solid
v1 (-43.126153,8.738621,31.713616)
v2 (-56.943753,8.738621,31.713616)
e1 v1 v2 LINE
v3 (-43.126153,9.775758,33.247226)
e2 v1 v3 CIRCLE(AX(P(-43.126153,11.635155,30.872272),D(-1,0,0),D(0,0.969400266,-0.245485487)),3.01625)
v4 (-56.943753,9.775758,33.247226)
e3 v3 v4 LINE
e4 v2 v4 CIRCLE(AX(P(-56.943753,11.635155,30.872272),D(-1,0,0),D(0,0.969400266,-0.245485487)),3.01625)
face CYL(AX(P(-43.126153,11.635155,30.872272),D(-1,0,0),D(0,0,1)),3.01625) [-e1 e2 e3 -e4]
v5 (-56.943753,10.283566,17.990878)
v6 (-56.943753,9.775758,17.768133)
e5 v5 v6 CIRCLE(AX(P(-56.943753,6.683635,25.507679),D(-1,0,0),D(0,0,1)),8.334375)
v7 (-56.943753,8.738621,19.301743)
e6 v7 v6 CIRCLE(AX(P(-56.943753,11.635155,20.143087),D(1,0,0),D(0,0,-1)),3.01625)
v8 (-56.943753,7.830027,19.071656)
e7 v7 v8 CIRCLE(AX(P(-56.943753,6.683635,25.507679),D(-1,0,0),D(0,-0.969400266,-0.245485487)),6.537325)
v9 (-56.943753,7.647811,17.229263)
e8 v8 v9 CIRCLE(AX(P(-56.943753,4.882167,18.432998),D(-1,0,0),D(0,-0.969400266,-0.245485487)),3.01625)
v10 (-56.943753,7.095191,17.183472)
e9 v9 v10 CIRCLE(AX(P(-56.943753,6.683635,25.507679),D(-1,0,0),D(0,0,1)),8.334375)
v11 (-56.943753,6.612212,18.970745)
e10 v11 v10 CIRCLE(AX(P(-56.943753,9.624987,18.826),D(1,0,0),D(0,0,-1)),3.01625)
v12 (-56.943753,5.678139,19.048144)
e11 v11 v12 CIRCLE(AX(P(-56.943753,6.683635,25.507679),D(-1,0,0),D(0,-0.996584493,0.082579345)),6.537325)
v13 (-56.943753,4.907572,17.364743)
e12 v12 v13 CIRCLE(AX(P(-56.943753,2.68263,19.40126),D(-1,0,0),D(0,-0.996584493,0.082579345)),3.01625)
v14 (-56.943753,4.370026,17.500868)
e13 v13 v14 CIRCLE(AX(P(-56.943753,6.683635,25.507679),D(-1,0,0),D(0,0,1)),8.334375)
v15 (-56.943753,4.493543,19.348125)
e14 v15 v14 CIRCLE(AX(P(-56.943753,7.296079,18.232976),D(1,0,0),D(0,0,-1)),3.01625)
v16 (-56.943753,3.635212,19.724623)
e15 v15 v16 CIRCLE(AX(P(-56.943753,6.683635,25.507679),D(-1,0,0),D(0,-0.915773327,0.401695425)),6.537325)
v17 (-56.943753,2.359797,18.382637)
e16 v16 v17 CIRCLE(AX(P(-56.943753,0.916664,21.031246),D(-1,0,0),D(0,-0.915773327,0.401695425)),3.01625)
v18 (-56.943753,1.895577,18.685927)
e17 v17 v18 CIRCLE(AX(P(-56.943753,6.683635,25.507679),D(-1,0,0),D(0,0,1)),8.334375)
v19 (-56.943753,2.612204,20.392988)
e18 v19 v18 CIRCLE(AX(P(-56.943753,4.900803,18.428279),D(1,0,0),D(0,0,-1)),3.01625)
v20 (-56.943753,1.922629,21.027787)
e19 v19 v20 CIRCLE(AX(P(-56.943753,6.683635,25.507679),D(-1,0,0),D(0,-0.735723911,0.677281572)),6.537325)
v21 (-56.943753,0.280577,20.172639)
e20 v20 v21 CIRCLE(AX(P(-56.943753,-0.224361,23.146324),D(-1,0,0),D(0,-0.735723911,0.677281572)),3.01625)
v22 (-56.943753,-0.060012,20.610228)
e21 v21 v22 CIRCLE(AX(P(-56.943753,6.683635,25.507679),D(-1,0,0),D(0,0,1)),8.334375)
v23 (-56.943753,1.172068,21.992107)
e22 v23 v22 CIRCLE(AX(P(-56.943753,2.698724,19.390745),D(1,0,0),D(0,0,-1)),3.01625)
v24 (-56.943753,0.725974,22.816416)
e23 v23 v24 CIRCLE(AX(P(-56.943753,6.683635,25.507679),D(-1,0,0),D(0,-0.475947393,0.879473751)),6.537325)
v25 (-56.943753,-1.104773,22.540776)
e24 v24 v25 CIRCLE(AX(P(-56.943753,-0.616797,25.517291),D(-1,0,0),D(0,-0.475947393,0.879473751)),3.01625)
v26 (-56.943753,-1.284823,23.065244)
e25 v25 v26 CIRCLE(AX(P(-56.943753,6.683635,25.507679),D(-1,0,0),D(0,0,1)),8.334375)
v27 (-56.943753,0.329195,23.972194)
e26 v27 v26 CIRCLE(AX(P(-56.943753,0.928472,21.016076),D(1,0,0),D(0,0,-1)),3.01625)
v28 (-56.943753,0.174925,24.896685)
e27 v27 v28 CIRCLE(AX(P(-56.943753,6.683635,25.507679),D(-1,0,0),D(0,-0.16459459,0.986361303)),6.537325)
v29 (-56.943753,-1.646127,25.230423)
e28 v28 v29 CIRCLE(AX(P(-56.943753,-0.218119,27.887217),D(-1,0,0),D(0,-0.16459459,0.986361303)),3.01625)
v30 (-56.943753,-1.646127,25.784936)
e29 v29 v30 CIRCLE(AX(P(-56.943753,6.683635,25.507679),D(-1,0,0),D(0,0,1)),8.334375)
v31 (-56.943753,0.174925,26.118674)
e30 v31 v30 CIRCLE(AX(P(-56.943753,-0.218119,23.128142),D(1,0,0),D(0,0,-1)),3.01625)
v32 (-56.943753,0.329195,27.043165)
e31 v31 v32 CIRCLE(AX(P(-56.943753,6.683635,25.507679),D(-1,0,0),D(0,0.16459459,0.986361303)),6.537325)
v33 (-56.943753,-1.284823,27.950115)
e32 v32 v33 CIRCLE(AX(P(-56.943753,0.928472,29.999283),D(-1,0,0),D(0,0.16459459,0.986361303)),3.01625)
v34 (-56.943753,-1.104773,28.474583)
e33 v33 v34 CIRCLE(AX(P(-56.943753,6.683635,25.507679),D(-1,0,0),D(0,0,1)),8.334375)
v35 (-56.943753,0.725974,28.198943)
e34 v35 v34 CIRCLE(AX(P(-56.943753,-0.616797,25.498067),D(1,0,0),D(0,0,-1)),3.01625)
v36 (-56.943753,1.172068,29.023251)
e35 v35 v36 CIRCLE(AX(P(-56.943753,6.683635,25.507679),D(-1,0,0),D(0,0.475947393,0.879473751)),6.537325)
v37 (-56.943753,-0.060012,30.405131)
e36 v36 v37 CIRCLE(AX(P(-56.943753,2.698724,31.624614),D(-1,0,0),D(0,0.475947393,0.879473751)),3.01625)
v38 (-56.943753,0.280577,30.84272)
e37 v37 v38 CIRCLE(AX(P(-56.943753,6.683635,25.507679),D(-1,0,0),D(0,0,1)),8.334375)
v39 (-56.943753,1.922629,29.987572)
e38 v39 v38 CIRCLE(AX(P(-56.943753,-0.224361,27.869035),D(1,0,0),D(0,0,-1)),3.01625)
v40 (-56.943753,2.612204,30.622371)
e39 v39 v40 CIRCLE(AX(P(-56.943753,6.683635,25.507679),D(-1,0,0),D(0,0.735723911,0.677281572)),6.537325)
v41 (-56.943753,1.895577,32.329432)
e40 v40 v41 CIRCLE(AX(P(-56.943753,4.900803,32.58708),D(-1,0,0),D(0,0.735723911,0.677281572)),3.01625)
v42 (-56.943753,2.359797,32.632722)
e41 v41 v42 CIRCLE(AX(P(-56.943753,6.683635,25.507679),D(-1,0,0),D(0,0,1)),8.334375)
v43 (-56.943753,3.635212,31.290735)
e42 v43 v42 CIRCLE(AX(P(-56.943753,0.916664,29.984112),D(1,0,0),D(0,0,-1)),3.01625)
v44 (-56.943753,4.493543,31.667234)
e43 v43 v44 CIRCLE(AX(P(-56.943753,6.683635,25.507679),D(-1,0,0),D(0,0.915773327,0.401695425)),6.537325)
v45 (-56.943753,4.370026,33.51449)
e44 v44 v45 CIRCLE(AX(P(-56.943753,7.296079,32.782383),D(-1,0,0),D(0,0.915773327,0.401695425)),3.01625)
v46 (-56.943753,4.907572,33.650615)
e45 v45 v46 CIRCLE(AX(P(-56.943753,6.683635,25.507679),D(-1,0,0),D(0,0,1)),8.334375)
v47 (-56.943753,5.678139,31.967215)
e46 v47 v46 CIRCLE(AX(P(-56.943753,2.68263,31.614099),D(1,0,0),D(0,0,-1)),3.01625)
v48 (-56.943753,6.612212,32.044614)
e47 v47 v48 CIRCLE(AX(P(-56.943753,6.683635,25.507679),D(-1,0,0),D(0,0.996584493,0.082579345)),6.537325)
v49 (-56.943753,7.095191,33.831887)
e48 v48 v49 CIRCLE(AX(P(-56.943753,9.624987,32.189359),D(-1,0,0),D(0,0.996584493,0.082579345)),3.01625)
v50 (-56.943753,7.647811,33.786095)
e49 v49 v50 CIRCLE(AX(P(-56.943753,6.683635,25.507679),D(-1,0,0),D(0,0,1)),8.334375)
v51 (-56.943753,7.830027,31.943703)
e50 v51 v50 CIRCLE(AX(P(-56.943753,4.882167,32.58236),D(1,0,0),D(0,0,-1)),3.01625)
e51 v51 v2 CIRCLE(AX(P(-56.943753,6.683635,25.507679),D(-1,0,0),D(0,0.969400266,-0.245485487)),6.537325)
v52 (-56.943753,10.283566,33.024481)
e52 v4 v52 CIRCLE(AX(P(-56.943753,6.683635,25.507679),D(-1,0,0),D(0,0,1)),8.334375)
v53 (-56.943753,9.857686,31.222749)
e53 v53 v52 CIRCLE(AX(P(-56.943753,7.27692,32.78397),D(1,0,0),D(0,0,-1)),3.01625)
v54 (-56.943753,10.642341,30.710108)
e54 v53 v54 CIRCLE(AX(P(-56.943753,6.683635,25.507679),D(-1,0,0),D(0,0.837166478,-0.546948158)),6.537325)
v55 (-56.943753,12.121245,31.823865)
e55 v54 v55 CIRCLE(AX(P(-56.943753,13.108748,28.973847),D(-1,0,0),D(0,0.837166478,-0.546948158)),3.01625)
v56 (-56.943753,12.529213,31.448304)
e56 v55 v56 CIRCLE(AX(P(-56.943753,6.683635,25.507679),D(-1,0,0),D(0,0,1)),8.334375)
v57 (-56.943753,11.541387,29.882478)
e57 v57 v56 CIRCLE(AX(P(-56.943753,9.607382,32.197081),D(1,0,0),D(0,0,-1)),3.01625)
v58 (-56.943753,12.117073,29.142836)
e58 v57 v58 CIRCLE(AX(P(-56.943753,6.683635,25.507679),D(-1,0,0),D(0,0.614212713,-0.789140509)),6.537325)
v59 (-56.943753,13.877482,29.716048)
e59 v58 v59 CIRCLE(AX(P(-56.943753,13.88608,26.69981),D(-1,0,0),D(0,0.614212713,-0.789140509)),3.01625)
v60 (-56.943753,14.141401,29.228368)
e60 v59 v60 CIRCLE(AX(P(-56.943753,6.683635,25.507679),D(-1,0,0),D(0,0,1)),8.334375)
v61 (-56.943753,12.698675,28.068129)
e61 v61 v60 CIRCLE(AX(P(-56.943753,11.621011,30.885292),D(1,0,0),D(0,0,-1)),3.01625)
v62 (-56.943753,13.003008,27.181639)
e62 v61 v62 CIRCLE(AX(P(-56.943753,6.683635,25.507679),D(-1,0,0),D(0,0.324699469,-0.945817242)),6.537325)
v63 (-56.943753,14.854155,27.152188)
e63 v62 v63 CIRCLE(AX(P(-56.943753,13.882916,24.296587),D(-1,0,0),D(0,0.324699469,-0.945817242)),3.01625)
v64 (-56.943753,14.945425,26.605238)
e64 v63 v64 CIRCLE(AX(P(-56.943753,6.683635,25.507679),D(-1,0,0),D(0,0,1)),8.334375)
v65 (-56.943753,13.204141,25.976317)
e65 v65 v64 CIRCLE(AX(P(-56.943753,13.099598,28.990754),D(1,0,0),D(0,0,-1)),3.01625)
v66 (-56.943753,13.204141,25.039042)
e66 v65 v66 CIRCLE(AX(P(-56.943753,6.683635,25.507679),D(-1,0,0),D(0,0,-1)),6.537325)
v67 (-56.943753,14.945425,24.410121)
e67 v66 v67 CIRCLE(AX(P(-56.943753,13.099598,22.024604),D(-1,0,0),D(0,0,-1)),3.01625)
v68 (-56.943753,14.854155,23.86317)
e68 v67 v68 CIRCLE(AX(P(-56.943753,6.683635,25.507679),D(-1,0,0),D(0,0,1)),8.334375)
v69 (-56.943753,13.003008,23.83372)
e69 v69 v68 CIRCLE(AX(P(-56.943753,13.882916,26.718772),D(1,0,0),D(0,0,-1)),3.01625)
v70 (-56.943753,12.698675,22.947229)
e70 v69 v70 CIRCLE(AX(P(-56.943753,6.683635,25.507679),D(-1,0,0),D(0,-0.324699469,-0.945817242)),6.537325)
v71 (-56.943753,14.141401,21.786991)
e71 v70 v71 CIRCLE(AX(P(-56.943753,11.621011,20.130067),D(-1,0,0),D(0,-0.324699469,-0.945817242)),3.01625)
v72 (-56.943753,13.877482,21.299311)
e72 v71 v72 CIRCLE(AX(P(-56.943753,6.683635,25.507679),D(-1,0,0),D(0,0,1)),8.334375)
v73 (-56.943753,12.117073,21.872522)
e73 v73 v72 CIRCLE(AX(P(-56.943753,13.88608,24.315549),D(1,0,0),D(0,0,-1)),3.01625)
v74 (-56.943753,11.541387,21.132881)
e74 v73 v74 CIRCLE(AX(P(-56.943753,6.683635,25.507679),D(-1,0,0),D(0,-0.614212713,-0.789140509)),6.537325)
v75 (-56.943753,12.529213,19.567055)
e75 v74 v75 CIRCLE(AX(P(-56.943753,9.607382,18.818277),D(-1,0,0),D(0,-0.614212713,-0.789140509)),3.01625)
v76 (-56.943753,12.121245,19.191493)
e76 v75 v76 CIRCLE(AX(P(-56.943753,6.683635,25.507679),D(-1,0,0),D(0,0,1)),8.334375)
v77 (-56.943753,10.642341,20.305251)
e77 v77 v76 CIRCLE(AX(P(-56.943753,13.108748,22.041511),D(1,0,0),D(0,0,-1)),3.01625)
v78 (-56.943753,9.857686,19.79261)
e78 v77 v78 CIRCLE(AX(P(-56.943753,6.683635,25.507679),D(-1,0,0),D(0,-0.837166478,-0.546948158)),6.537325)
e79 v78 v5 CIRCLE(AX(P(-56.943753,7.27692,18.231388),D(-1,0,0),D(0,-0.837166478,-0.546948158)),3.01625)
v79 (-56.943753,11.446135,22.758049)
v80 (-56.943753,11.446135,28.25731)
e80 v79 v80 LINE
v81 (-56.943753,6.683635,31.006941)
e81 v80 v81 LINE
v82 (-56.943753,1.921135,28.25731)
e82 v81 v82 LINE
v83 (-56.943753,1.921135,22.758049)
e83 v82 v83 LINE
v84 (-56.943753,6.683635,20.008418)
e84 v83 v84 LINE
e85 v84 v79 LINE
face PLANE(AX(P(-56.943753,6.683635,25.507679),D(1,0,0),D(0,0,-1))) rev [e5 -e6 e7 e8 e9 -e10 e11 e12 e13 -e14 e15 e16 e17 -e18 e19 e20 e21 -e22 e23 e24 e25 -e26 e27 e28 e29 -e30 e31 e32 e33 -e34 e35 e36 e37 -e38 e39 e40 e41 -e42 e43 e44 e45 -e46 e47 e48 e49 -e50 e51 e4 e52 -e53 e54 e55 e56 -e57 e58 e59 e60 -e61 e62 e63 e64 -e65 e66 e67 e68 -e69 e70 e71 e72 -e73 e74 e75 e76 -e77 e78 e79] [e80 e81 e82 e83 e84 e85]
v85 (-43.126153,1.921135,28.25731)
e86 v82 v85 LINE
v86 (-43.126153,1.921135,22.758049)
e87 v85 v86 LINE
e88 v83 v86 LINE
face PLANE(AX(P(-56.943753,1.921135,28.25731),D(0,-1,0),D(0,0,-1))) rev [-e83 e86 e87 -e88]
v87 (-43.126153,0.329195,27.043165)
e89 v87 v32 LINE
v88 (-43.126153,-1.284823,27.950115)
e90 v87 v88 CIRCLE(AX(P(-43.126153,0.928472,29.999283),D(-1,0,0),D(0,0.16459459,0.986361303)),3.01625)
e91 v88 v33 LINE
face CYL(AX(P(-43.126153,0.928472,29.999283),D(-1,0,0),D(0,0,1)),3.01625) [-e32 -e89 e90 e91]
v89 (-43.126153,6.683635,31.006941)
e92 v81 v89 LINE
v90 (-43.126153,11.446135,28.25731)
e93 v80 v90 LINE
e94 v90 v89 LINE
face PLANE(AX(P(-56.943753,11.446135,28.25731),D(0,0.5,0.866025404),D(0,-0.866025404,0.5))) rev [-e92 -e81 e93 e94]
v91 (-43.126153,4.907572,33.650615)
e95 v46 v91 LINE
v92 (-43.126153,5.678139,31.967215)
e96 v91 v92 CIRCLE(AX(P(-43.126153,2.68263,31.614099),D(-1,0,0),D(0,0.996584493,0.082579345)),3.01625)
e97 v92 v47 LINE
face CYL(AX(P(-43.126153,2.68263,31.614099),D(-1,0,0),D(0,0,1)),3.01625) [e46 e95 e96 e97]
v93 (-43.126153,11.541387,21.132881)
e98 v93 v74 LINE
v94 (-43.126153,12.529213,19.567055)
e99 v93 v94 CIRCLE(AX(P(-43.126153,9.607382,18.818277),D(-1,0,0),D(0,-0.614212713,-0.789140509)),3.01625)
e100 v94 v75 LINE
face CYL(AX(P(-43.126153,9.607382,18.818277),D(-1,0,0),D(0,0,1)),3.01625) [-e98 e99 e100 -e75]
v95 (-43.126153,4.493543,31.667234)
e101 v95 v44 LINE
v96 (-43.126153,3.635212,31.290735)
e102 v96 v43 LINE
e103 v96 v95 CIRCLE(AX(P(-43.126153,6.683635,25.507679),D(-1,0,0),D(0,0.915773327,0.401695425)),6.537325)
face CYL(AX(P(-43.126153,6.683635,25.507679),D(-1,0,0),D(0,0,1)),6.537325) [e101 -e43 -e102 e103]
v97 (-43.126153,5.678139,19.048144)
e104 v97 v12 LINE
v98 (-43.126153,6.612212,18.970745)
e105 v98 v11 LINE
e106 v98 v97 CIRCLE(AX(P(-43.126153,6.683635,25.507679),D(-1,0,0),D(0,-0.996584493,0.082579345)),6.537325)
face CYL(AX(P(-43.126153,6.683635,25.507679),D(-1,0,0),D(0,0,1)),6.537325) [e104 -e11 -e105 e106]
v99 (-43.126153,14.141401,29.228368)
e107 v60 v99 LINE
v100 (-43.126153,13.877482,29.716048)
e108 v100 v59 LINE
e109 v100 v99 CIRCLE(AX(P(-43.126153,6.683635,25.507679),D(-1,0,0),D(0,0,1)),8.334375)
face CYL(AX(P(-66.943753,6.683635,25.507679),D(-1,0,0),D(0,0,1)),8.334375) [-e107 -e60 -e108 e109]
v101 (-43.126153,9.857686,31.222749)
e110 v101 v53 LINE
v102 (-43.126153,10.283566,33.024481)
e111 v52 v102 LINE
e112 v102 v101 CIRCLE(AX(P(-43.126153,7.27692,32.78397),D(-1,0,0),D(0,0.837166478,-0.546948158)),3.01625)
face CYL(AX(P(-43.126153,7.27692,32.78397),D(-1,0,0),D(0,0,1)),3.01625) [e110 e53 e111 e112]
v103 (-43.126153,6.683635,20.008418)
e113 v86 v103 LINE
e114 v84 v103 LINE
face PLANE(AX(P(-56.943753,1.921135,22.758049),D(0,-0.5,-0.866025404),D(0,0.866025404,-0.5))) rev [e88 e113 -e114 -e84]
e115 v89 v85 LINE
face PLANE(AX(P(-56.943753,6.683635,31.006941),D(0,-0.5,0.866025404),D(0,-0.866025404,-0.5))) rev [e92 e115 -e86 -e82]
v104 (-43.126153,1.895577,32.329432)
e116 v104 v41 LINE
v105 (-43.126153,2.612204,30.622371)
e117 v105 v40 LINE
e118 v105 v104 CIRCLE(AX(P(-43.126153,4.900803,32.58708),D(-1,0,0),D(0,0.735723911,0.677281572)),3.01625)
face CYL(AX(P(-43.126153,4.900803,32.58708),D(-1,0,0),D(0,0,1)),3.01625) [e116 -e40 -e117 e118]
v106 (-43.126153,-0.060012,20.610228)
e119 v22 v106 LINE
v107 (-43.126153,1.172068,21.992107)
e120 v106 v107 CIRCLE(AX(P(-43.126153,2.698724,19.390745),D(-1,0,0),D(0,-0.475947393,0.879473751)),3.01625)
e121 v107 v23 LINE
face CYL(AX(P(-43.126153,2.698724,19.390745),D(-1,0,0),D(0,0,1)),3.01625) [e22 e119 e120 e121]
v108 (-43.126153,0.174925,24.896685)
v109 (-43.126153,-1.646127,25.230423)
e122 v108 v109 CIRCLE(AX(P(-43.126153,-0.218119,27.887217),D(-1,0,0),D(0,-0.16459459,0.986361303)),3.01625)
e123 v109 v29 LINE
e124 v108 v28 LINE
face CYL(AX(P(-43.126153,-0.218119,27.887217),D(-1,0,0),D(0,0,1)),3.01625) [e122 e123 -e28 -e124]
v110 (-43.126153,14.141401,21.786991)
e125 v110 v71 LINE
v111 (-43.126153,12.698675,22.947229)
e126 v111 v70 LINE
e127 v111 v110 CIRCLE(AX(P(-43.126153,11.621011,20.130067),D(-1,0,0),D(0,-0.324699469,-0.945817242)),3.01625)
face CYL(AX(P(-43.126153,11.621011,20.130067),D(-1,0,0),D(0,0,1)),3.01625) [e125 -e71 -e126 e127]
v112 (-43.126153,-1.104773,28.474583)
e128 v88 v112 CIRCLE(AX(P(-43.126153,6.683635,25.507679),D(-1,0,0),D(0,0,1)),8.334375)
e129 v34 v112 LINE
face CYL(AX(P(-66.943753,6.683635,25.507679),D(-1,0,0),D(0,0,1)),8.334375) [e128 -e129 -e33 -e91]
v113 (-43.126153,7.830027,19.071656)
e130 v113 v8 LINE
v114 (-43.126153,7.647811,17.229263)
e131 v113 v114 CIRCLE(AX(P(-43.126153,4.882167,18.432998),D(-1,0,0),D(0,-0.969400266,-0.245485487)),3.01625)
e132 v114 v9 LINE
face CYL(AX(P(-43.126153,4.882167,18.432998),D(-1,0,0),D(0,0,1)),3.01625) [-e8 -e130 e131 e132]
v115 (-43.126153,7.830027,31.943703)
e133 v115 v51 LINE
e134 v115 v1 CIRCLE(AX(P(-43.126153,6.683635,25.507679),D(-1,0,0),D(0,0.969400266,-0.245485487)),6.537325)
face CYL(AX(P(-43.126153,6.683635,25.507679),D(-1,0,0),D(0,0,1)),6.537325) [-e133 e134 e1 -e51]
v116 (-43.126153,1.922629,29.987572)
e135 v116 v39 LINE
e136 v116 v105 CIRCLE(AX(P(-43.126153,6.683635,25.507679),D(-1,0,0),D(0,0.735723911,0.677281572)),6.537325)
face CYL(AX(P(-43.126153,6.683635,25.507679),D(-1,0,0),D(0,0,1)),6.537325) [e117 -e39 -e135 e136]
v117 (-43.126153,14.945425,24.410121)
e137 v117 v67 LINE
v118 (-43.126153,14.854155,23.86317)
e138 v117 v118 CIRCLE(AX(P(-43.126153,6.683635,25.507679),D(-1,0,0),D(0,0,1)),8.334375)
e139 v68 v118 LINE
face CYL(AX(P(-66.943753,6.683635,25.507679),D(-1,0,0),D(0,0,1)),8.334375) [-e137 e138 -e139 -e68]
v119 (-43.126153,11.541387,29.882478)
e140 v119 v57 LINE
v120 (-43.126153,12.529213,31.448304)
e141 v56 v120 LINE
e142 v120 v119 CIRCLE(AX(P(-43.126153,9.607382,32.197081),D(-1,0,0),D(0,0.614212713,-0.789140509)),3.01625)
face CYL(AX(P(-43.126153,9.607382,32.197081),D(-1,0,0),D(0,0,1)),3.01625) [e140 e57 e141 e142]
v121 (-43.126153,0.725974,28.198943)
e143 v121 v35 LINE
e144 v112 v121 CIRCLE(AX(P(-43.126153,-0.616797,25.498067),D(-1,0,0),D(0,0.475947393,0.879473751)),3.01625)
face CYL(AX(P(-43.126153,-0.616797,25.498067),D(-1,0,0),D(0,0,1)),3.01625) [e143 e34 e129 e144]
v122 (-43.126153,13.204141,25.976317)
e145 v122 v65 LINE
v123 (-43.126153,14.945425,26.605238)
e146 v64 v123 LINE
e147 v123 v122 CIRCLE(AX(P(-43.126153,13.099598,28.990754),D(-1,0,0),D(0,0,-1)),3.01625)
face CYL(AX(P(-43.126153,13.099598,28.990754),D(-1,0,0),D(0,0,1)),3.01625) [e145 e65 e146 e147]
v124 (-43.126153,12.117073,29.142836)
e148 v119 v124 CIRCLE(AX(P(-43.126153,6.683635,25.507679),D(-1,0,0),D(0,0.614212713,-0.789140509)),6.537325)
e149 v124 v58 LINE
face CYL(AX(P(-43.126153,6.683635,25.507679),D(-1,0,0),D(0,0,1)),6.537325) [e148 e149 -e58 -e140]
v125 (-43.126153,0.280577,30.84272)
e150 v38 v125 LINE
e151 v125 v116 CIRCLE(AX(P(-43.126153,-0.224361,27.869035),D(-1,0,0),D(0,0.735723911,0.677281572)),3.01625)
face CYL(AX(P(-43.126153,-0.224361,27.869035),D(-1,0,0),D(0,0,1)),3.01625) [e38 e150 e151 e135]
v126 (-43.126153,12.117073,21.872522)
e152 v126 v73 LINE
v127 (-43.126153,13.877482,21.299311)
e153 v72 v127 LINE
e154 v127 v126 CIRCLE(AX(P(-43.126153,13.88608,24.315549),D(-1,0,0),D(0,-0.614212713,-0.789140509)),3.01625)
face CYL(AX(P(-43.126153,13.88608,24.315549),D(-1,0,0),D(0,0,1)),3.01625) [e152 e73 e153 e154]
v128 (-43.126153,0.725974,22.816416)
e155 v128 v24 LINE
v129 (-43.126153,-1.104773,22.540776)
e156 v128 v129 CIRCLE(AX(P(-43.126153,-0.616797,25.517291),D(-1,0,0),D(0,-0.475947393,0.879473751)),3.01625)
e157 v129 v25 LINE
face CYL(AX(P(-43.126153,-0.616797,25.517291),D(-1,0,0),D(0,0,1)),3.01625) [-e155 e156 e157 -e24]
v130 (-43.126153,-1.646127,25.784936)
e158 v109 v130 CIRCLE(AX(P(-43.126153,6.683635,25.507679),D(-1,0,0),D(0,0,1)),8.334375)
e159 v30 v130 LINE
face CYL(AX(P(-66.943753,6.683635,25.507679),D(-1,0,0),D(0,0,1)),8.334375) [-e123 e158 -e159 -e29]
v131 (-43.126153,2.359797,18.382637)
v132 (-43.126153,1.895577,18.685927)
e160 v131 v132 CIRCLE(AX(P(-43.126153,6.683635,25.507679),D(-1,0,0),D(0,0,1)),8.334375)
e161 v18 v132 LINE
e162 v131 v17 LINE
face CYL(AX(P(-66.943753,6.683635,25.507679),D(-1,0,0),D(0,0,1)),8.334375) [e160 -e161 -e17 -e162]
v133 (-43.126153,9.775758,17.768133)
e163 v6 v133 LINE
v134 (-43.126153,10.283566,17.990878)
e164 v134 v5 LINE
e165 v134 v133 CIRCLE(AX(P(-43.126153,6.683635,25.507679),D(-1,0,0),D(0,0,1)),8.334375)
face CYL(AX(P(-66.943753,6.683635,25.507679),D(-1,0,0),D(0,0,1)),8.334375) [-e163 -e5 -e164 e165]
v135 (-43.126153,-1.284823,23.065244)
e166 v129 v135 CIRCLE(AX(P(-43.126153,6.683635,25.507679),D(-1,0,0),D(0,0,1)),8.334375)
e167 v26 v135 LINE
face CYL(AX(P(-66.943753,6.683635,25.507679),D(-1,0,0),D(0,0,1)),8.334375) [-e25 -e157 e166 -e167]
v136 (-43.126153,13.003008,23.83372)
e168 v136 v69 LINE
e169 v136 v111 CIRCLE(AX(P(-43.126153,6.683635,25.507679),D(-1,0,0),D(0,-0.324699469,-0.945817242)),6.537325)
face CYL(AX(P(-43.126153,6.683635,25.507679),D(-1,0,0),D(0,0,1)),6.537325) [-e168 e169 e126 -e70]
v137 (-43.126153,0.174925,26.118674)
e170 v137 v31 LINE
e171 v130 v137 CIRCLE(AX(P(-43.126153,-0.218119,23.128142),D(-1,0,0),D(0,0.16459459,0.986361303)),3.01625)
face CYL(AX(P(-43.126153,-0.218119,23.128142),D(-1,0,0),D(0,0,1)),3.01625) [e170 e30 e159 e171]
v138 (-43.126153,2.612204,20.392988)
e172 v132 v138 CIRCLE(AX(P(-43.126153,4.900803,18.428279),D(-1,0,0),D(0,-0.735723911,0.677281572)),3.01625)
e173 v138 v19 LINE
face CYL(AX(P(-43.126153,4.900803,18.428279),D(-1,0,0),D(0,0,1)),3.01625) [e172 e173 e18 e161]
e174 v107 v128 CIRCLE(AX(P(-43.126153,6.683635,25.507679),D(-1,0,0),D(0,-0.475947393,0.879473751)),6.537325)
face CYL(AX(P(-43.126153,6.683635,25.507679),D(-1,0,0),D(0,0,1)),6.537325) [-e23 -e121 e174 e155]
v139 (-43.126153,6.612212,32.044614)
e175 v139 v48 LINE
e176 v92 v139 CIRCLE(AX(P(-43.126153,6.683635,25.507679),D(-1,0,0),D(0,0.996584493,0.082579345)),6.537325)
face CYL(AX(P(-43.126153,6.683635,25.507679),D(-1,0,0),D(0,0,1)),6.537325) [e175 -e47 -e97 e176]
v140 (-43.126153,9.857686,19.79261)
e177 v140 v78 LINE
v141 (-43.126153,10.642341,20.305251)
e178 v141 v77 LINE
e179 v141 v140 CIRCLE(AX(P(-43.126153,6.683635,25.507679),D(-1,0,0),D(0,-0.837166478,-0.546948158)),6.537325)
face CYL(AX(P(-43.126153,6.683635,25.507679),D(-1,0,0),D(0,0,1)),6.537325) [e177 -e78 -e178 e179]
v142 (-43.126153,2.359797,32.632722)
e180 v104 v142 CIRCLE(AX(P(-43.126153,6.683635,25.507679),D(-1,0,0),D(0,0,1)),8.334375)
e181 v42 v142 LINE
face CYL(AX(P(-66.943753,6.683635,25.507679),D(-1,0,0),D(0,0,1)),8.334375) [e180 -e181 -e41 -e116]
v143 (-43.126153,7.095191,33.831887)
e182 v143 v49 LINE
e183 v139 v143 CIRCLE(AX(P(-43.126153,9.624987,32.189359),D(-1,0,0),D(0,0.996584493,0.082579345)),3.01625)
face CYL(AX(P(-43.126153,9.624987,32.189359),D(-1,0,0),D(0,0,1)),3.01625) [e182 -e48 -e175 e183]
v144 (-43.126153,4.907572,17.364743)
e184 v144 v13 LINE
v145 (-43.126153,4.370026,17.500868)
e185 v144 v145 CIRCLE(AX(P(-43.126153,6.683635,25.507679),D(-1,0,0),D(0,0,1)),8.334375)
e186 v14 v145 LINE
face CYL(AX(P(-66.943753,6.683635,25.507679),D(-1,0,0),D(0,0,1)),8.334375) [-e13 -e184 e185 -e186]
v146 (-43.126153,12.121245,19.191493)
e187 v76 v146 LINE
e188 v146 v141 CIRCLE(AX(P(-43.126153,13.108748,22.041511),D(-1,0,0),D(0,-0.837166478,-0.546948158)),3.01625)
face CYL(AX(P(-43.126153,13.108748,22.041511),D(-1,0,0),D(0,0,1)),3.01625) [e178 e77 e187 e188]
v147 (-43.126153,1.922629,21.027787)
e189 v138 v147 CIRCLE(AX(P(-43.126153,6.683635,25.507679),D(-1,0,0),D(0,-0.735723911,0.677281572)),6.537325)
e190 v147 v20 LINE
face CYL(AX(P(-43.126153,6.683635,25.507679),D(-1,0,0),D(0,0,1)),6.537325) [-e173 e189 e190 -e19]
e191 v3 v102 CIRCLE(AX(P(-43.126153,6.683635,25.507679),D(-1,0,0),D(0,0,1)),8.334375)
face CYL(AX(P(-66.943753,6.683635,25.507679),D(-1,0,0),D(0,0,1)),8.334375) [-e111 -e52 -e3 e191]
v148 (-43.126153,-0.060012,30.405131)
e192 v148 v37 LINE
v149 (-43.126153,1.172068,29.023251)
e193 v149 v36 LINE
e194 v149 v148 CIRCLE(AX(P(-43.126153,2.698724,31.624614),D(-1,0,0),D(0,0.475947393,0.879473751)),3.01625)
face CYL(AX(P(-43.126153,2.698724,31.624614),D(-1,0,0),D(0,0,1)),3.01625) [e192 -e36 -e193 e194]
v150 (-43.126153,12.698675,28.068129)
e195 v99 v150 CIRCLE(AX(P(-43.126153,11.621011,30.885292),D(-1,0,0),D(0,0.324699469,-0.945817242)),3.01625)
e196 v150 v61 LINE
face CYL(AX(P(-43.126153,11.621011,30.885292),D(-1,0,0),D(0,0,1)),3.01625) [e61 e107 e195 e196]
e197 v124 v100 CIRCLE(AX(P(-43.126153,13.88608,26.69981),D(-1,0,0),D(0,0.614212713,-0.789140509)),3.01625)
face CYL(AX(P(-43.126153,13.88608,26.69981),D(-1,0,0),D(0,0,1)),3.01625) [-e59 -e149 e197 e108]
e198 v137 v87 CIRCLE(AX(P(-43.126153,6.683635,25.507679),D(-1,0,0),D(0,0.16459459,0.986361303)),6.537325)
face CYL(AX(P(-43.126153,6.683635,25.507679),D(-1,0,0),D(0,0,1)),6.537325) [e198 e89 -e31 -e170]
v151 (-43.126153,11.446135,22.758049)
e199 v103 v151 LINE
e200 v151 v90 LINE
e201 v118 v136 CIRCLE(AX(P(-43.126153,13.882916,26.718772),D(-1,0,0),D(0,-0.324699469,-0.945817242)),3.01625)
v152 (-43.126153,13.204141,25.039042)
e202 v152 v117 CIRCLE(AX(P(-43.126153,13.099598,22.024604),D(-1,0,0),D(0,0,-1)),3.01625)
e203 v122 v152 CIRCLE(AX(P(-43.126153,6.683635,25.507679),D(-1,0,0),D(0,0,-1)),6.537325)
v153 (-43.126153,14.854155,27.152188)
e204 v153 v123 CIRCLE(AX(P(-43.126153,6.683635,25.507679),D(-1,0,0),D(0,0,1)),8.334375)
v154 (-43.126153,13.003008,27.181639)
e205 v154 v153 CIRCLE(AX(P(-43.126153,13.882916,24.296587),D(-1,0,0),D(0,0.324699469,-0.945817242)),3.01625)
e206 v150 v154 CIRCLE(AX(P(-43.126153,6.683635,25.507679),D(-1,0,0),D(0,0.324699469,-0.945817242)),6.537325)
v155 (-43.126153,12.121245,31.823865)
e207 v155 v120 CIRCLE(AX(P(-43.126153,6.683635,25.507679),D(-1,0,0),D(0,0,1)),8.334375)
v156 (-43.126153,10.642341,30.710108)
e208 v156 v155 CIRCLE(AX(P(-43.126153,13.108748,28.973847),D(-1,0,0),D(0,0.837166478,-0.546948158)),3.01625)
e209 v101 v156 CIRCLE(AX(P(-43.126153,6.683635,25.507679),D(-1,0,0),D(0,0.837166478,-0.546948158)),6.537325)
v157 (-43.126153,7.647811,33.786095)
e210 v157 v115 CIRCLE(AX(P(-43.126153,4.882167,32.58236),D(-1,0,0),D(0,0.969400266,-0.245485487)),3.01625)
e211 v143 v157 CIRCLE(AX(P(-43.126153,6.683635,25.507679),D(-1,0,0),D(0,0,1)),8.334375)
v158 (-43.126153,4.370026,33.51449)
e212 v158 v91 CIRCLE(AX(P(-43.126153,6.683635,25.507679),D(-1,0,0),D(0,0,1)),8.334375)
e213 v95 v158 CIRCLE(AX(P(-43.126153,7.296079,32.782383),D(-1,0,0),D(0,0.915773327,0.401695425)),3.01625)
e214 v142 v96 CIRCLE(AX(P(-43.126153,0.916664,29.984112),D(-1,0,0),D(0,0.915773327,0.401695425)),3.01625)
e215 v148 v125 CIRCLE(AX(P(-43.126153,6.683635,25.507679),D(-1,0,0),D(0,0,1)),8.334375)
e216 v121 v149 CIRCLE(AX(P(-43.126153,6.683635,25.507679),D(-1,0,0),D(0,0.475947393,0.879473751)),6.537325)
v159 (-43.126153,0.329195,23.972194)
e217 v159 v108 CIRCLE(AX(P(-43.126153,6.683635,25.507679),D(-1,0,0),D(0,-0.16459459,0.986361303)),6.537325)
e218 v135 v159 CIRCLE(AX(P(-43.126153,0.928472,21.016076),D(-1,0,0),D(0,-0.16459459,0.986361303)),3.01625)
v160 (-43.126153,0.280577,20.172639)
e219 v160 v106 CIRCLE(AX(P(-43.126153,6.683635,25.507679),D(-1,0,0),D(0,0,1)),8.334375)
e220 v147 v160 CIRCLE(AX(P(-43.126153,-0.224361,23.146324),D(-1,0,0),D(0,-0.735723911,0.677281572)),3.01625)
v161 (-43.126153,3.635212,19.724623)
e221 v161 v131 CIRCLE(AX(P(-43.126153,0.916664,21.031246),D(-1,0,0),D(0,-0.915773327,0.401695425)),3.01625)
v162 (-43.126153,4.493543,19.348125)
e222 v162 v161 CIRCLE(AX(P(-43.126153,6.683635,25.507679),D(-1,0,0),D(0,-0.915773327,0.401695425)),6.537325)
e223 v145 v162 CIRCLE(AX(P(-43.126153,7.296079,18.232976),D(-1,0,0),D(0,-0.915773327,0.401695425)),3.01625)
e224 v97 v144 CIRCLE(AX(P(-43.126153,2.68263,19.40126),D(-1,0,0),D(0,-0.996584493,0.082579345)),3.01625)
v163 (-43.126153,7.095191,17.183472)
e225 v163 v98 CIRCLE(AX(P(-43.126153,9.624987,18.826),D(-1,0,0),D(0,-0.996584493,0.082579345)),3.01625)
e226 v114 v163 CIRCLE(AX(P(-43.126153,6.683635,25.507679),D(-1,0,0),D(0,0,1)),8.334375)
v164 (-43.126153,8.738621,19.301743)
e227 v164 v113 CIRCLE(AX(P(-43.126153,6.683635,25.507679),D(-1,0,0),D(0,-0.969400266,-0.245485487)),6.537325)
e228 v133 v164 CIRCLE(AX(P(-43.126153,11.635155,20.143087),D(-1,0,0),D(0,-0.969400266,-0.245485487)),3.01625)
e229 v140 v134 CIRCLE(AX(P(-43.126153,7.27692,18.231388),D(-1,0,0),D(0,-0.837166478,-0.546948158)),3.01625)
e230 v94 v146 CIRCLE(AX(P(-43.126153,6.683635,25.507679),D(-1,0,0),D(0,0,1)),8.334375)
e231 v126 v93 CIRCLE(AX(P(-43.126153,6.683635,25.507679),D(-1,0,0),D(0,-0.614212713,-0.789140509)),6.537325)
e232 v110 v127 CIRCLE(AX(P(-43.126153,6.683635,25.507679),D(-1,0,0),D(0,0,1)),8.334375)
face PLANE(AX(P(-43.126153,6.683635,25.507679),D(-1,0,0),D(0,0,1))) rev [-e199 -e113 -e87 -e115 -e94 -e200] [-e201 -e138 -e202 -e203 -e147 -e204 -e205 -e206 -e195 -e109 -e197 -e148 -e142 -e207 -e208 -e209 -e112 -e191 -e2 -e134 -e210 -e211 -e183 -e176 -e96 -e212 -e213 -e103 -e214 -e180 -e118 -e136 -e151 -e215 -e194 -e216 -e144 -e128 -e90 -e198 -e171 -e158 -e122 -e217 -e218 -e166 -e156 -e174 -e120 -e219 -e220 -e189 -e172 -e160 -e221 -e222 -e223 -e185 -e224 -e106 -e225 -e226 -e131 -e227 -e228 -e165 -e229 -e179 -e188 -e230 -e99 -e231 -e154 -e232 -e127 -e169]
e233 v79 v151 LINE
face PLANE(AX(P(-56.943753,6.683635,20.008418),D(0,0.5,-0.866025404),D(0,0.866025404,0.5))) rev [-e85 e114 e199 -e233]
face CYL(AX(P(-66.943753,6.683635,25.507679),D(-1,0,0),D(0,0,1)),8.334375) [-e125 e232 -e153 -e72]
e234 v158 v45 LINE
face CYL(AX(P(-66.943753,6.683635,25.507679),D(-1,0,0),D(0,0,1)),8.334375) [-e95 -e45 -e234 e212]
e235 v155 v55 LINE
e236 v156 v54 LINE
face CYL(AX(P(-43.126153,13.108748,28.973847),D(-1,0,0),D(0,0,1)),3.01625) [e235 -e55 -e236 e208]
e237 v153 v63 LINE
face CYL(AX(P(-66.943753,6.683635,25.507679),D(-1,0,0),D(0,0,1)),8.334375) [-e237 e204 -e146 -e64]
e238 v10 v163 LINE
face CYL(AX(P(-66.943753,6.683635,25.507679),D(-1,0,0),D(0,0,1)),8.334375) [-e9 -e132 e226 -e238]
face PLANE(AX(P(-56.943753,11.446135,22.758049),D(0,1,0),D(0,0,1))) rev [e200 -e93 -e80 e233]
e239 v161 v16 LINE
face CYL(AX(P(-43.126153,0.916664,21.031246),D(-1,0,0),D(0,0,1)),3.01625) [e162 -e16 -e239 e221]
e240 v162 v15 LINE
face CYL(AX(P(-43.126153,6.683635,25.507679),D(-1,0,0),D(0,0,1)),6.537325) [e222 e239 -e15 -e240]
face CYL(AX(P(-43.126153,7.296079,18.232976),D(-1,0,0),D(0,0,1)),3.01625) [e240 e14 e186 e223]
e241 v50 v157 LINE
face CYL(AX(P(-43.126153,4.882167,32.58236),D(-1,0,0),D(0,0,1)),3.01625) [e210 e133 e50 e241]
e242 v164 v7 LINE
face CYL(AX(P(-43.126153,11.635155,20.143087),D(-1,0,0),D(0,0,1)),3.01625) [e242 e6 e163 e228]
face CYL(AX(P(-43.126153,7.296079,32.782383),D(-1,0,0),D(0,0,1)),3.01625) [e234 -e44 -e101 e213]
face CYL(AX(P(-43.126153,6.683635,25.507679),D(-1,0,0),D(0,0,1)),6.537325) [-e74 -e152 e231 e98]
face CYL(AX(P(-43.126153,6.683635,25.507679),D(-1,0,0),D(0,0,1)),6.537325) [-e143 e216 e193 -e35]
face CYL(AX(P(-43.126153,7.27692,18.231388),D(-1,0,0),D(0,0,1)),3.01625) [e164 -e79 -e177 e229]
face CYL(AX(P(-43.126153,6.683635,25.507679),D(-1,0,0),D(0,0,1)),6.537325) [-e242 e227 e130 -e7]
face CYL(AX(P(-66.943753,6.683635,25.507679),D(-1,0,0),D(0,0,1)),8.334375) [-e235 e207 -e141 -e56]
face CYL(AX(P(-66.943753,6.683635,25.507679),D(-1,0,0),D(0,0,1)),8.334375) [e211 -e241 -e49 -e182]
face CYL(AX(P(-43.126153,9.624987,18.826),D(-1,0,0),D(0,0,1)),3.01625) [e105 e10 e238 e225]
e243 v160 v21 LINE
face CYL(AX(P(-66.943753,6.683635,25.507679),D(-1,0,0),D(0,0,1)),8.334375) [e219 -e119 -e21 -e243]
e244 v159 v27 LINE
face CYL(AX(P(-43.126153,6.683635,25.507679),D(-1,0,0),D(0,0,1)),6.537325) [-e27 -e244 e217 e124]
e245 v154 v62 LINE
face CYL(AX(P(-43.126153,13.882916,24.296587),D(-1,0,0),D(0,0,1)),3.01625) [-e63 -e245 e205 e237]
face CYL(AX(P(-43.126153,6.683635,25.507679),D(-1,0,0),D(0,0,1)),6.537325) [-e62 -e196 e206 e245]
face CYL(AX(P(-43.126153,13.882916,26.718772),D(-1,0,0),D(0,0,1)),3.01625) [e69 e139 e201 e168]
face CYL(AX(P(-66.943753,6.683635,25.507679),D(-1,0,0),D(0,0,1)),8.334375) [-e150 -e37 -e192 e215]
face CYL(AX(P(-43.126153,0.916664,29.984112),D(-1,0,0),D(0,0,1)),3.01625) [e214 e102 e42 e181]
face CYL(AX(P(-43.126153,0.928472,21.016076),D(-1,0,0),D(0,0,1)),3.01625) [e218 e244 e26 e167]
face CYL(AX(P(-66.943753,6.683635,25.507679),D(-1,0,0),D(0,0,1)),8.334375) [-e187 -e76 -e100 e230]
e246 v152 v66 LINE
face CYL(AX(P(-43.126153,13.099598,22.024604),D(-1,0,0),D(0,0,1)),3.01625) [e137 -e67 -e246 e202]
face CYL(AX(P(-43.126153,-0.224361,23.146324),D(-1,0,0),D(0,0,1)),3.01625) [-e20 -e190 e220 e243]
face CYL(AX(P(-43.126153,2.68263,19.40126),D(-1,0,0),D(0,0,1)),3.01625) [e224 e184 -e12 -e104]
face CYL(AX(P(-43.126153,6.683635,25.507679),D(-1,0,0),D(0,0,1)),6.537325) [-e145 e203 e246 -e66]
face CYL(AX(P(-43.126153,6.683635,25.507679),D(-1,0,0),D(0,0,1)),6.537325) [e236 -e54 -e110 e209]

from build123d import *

# Parameters (mm, degrees)
SPUR_START             = -56.943752669
SPUR_GEAR_AI_OUTLINE_R = 4.7625
SPUR_GEAR_AI_DEPTH     = 13.8176
CUT_EXTRUDE1_DEPTH     = 40.482760103


# Read off the part's stored shape, not the designer's step: spur gear_ai
with BuildPart() as part:
    # spur gear_ai outline → spur gear_ai (new body)
    with BuildSketch(Plane.YZ.offset(SPUR_START)):
        with BuildLine():
            ThreePointArc((13.877482254, 21.299310941), (14.013498804, 21.54095532), (14.141401376, 21.786990765))
            ThreePointArc((14.141401376, 21.786990765), (13.511259094, 22.480540591), (12.698675372, 22.947229299))
            ThreePointArc((12.698675372, 22.947229299), (12.866749459, 23.385013416), (13.003007958, 23.833719839))
            ThreePointArc((13.003007958, 23.833719839), (13.930896828, 23.702903551), (14.85415475, 23.863170414))
            ThreePointArc((14.85415475, 23.863170414), (14.904339747, 24.135886336), (14.945424627, 24.410120799))
            ThreePointArc((14.945424627, 24.410120799), (14.124229931, 24.861485317), (13.20414066, 25.039042041))
            ThreePointArc((13.20414066, 25.039042041), (13.220959759, 25.507679374), (13.20414066, 25.976316707))
            ThreePointArc((13.20414066, 25.976316707), (14.124229931, 26.15387343), (14.945424627, 26.605237949))
            ThreePointArc((14.945424627, 26.605237949), (14.904339747, 26.879472412), (14.85415475, 27.152188334))
            ThreePointArc((14.85415475, 27.152188334), (13.930896828, 27.312455197), (13.003007958, 27.181638909))
            ThreePointArc((13.003007958, 27.181638909), (12.866749459, 27.630345332), (12.698675372, 28.068129449))
            ThreePointArc((12.698675372, 28.068129449), (13.511259094, 28.534818157), (14.141401376, 29.228367983))
            ThreePointArc((14.141401376, 29.228367983), (14.013498804, 29.474403428), (13.877482254, 29.716047807))
            ThreePointArc((13.877482254, 29.716047807), (12.952210428, 29.567849612), (12.117073115, 29.142836288))
            ThreePointArc((12.117073115, 29.142836288), (11.84250274, 29.522987496), (11.5413871, 29.882477695))
            ThreePointArc((11.5413871, 29.882477695), (12.158409219, 30.587725425), (12.529213394, 31.448303673))
            ThreePointArc((12.529213394, 31.448303673), (12.328353358, 31.639478342), (12.121244757, 31.82386526))
            ThreePointArc((12.121244757, 31.82386526), (11.294226586, 31.383261581), (10.642340918, 30.710108009))
            ThreePointArc((10.642340918, 30.710108009), (10.259212627, 30.980508721), (9.857685986, 31.222748662))
            ThreePointArc((9.857685986, 31.222748662), (10.212282581, 32.09013088), (10.283566263, 33.024480543))
            ThreePointArc((10.283566263, 33.024480543), (10.031515064, 33.140077693), (9.775757844, 33.247225967))
            ThreePointArc((9.775757844, 33.247225967), (9.13661358, 32.561963049), (8.738621482, 31.713615864))
            ThreePointArc((8.738621482, 31.713615864), (8.288453171, 31.844963967), (7.830027171, 31.943703192))
            ThreePointArc((7.830027171, 31.943703192), (7.883772199, 32.879225575), (7.647810695, 33.78609537))
            ThreePointArc((7.647810695, 33.78609537), (7.371881992, 33.813588258), (7.095191416, 33.831886709))
            ThreePointArc((7.095191416, 33.831886709), (6.713182256, 32.976223424), (6.612212349, 32.044614206))
            ThreePointArc((6.612212349, 32.044614206), (6.14378674, 32.022676095), (5.678138951, 31.967214677))
            ThreePointArc((5.678138951, 31.967214677), (5.425208304, 32.869498859), (4.907571703, 33.650615372))
            ThreePointArc((4.907571703, 33.650615372), (4.637666652, 33.587024715), (4.370026438, 33.514490423))
            ThreePointArc((4.370026438, 33.514490423), (4.286549003, 32.581151163), (4.493542942, 31.667234227))
            ThreePointArc((4.493542942, 31.667234227), (4.057621217, 31.494387237), (3.635211803, 31.290735282))
            ThreePointArc((3.635211803, 31.290735282), (3.103014441, 32.062004771), (2.359796702, 32.632721907))
            ThreePointArc((2.359796702, 32.632721907), (2.125163704, 32.484938741), (1.895576821, 32.329431921))
            ThreePointArc((1.895576821, 32.329431921), (2.119677185, 31.419558478), (2.612203966, 30.622370905))
            ThreePointArc((2.612203966, 30.622370905), (2.256025009, 30.317345688), (1.922628583, 29.987572046))
            ThreePointArc((1.922628583, 29.987572046), (1.168836349, 30.544247826), (0.280576646, 30.842719527))
            ThreePointArc((0.280576646, 30.842719527), (0.106641826, 30.626758451), (-0.060012425, 30.405130681))
            ThreePointArc((-0.060012425, 30.405130681), (0.447380989, 29.61732196), (1.172067692, 29.023251392))
            ThreePointArc((1.172067692, 29.023251392), (0.934229019, 28.619102165), (0.725974258, 28.198942925))
            ThreePointArc((0.725974258, 28.198942925), (-0.167727764, 28.480700538), (-1.10477271, 28.474582766))
            ThreePointArc((-1.10477271, 28.474582766), (-1.199160815, 28.213846513), (-1.284822859, 27.950114599))
            ThreePointArc((-1.284822859, 27.950114599), (-0.549120347, 27.369741899), (0.32919523, 27.043165102))
            ThreePointArc((0.32919523, 27.043165102), (0.235470351, 26.583687704), (0.17492489, 26.11867364))
            ThreePointArc((0.17492489, 26.11867364), (-0.761840439, 26.094980276), (-1.646127267, 25.784935985))
            ThreePointArc((-1.646127267, 25.784935985), (-1.650740241, 25.507679374), (-1.646127267, 25.230422763))
            ThreePointArc((-1.646127267, 25.230422763), (-0.761840439, 24.920378472), (0.17492489, 24.896685107))
            ThreePointArc((0.17492489, 24.896685107), (0.235470351, 24.431671044), (0.32919523, 23.972193646))
            ThreePointArc((0.32919523, 23.972193646), (-0.549120347, 23.645616848), (-1.284822859, 23.065244149))
            ThreePointArc((-1.284822859, 23.065244149), (-1.199160815, 22.801512235), (-1.10477271, 22.540775982))
            ThreePointArc((-1.10477271, 22.540775982), (-0.167727765, 22.53465821), (0.725974258, 22.816415822))
            ThreePointArc((0.725974258, 22.816415822), (0.934229019, 22.396256583), (1.172067692, 21.992107356))
            ThreePointArc((1.172067692, 21.992107356), (0.447380989, 21.398036788), (-0.060012425, 20.610228067))
            ThreePointArc((-0.060012425, 20.610228067), (0.106641826, 20.388600297), (0.280576646, 20.17263922))
            ThreePointArc((0.280576646, 20.17263922), (1.168836349, 20.471110922), (1.922628583, 21.027786702))
            ThreePointArc((1.922628583, 21.027786702), (2.256025009, 20.69801306), (2.612203966, 20.392987843))
            ThreePointArc((2.612203966, 20.392987843), (2.119677185, 19.59580027), (1.895576821, 18.685926827))
            ThreePointArc((1.895576821, 18.685926827), (2.125163704, 18.530420007), (2.359796702, 18.382636841))
            ThreePointArc((2.359796702, 18.382636841), (3.103014441, 18.953353977), (3.635211803, 19.724623466))
            ThreePointArc((3.635211803, 19.724623466), (4.057621217, 19.520971511), (4.493542942, 19.348124521))
            ThreePointArc((4.493542942, 19.348124521), (4.286549003, 18.434207585), (4.370026438, 17.500868325))
            ThreePointArc((4.370026438, 17.500868325), (4.637666652, 17.428334032), (4.907571703, 17.364743376))
            ThreePointArc((4.907571703, 17.364743376), (5.425208304, 18.145859889), (5.678138951, 19.048144071))
            ThreePointArc((5.678138951, 19.048144071), (6.14378674, 18.992682653), (6.612212349, 18.970744542))
            ThreePointArc((6.612212349, 18.970744542), (6.713182256, 18.039135324), (7.095191416, 17.183472039))
            ThreePointArc((7.095191416, 17.183472039), (7.371881992, 17.20177049), (7.647810695, 17.229263378))
            ThreePointArc((7.647810695, 17.229263378), (7.883772199, 18.136133173), (7.830027171, 19.071655555))
            ThreePointArc((7.830027171, 19.071655555), (8.288453171, 19.17039478), (8.738621482, 19.301742883))
            ThreePointArc((8.738621482, 19.301742883), (9.13661358, 18.453395698), (9.775757844, 17.768132781))
            ThreePointArc((9.775757844, 17.768132781), (10.031515064, 17.875281055), (10.283566263, 17.990878205))
            ThreePointArc((10.283566263, 17.990878205), (10.212282581, 18.925227868), (9.857685986, 19.792610086))
            ThreePointArc((9.857685986, 19.792610086), (10.259212627, 20.034850026), (10.642340918, 20.305250738))
            ThreePointArc((10.642340918, 20.305250738), (11.294226586, 19.632097166), (12.121244757, 19.191493488))
            ThreePointArc((12.121244757, 19.191493488), (12.328353358, 19.375880406), (12.529213394, 19.567055074))
            ThreePointArc((12.529213394, 19.567055074), (12.158409219, 20.427633322), (11.5413871, 21.132881053))
            ThreePointArc((11.5413871, 21.132881053), (11.84250274, 21.492371252), (12.117073115, 21.87252246))
            ThreePointArc((12.117073115, 21.87252246), (12.952210428, 21.447509136), (13.877482254, 21.299310941))
        make_face()
        with Locations((6.683634759, 25.507679374)):
            Circle(SPUR_GEAR_AI_OUTLINE_R, mode=Mode.SUBTRACT)
    extrude(amount=SPUR_GEAR_AI_DEPTH)

    # Sketch1 → Cut-Extrude1 (cut, through all)
    with BuildSketch(Plane(origin=(-43.126152669, 0, 0), x_dir=(0, 0, -1), z_dir=(1, 0, 0))):
        Polygon((-22.758048717, 11.446134759), (-28.257310031, 11.446134759), (-31.006940688, 6.683634759), (-28.257310031, 1.921134759), (-22.758048717, 1.921134759), (-20.00841806, 6.683634759), align=None)
    extrude(amount=-CUT_EXTRUDE1_DEPTH, mode=Mode.SUBTRACT)


solid = part.part
